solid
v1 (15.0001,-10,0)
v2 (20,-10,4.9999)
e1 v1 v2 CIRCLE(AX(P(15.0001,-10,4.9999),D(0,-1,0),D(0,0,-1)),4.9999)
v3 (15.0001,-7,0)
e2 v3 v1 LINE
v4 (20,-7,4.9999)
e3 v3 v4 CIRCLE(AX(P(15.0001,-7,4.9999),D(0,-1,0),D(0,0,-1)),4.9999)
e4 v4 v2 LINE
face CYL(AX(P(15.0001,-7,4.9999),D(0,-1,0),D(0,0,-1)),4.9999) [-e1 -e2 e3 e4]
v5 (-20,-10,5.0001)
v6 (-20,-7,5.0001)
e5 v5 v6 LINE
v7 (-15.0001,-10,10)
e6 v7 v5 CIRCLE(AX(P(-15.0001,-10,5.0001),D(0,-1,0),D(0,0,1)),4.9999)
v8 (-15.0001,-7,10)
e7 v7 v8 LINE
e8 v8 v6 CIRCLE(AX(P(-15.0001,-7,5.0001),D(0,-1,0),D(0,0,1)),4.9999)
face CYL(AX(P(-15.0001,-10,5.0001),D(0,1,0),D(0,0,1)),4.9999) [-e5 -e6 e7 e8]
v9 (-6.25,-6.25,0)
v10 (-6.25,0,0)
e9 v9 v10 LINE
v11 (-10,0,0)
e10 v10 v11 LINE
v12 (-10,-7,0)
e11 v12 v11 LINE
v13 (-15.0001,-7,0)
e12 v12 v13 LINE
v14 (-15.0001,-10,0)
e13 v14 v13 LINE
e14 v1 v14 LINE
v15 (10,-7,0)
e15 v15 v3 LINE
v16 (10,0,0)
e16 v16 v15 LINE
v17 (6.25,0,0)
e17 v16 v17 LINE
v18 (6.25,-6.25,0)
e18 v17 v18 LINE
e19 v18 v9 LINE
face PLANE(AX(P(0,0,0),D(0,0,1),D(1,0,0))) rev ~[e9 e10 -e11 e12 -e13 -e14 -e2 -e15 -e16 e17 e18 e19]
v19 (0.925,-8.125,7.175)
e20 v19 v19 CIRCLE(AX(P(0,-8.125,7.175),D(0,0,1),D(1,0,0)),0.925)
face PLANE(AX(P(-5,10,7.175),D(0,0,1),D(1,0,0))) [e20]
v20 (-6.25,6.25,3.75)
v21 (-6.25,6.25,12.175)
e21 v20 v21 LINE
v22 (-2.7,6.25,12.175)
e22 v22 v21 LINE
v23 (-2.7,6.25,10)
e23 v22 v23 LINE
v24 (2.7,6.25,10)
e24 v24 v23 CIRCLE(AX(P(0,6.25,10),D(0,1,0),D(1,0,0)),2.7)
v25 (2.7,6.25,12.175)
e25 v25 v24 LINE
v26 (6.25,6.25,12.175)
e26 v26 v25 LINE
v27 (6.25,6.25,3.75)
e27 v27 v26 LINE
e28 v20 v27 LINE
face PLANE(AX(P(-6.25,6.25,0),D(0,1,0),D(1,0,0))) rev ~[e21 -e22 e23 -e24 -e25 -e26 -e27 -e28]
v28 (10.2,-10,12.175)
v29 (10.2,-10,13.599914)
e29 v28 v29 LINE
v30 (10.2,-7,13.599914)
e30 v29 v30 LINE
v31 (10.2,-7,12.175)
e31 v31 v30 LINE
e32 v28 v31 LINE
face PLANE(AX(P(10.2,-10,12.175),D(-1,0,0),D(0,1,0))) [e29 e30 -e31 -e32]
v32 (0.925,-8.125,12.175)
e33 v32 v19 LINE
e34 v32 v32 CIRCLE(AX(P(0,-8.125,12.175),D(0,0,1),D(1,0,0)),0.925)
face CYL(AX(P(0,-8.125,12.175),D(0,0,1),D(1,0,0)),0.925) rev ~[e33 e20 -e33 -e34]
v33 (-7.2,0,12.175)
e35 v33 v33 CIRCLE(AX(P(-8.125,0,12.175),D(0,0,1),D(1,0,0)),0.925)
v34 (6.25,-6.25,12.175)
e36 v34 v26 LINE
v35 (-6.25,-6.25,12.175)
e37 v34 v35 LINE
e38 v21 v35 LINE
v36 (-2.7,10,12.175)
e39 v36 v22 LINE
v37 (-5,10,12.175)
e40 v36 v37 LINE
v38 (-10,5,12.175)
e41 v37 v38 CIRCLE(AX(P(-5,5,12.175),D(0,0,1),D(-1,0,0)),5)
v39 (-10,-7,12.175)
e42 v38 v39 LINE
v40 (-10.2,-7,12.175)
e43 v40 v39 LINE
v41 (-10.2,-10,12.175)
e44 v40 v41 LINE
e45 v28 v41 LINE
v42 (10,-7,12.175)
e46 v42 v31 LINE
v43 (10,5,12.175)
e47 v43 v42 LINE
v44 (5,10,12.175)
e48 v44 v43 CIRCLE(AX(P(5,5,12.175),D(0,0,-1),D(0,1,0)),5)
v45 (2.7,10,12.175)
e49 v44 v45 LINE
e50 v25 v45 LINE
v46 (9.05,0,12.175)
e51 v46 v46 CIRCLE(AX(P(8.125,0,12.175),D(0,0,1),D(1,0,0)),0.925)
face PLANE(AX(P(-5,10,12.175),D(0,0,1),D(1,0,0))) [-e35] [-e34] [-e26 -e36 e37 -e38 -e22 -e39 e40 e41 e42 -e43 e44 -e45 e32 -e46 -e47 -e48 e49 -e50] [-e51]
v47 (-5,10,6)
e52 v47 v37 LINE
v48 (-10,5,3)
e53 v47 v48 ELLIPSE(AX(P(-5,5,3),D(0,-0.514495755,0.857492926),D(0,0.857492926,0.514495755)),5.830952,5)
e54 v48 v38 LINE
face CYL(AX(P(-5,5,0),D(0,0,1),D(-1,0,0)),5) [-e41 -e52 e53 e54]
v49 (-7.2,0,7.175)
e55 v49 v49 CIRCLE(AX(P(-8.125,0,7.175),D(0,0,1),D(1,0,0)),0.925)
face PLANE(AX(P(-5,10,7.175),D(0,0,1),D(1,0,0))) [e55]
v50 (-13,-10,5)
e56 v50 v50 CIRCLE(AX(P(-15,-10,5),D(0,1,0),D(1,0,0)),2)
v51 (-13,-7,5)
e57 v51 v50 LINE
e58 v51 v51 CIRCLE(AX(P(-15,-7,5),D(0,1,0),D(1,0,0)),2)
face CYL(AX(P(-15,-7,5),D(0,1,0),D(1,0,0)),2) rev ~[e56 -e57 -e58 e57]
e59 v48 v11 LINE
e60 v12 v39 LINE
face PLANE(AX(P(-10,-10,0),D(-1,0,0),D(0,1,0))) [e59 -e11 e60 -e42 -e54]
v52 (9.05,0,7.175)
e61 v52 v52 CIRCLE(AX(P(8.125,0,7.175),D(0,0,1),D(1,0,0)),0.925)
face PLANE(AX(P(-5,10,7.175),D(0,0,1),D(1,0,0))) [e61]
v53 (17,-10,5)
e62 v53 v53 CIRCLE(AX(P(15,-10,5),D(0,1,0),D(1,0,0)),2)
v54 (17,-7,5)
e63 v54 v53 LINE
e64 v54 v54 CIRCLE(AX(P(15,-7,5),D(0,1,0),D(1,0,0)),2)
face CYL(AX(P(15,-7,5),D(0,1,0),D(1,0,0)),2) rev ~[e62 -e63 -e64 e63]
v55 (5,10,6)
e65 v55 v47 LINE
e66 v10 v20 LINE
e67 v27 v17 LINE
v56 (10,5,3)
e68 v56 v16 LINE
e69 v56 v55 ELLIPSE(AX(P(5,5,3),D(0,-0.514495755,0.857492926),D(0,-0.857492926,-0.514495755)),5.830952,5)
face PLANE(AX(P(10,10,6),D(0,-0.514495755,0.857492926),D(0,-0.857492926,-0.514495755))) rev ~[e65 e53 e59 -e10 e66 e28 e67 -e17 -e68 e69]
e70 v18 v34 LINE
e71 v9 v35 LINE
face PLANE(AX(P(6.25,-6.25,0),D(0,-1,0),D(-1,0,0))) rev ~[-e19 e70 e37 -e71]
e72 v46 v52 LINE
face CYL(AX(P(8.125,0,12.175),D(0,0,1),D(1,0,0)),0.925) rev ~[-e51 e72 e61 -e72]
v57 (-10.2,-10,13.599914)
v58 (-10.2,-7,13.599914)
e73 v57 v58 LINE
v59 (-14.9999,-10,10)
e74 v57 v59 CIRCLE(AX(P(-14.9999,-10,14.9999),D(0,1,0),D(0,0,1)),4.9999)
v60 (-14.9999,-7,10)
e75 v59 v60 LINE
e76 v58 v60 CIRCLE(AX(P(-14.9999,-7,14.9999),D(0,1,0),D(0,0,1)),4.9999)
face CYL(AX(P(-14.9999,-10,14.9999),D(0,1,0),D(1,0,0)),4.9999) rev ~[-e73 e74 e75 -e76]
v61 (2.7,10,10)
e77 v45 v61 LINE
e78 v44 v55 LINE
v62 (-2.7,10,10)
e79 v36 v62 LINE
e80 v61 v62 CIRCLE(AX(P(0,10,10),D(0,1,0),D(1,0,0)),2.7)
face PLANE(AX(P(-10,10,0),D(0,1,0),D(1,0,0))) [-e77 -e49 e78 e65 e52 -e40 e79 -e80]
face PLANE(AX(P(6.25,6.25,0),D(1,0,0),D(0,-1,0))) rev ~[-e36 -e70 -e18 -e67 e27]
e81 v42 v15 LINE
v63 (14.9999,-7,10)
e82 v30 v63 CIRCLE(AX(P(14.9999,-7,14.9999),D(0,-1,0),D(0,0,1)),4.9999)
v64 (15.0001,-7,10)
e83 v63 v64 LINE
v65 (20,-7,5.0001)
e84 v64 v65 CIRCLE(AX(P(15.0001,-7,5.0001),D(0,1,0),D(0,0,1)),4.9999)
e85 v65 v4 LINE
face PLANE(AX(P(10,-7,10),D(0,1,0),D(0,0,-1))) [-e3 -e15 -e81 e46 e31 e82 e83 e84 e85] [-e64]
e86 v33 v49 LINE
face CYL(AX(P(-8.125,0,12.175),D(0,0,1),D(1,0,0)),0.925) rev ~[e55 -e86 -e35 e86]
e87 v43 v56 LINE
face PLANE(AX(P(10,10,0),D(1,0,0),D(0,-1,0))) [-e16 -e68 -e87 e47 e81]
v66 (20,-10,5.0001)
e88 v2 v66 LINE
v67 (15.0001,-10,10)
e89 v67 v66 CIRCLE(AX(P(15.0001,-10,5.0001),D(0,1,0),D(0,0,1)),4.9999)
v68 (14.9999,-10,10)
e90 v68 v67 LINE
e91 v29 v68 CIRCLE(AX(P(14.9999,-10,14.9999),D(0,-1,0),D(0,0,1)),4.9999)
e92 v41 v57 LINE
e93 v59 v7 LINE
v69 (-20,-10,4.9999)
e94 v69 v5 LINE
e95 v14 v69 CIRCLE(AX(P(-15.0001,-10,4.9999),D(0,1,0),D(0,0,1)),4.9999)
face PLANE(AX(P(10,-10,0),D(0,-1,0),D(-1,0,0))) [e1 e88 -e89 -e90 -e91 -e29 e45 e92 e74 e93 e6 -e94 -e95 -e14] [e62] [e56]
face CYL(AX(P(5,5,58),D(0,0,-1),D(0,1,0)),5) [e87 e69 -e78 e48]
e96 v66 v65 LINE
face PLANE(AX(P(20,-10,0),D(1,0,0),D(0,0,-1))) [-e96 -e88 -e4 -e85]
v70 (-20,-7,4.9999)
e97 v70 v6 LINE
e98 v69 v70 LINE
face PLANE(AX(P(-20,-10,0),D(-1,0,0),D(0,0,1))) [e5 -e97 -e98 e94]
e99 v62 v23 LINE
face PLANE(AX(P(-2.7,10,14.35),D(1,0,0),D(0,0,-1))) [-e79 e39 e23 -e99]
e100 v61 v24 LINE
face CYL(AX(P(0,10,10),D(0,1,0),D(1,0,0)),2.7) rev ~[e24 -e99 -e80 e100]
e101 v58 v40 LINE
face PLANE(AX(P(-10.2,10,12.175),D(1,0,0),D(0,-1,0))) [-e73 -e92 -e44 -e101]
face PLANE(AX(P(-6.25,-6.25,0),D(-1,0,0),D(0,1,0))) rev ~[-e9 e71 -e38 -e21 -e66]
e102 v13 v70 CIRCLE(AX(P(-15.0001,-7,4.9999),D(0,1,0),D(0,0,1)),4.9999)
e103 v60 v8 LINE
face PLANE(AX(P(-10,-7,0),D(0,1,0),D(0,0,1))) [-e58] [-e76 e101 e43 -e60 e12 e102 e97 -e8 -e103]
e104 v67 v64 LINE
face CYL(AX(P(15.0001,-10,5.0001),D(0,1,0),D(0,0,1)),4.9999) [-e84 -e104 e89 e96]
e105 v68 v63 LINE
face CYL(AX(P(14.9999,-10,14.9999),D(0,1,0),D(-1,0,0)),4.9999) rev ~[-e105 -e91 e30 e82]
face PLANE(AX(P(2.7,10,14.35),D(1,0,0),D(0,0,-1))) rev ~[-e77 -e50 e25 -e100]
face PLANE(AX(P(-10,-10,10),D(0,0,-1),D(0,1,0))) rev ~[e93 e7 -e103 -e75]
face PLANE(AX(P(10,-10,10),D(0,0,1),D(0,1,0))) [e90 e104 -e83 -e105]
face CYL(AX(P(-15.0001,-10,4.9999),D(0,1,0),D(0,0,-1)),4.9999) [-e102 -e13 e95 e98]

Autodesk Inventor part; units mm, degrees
ref_plane "YZ Plane" through (0, 0, 0) normal (1, 0, 0) x (0, 1, 0)
ref_plane "XZ Plane" through (0, 0, 0) normal (0, 1, 0) x (-1, 0, 0)
ref_plane "XY Plane" through (0, 0, 0) normal (0, 0, 1) x (1, 0, 0)
sketch "Sketch1" plane through (0, 0, 0) normal (0, 0, 1) x (1, 0, 0)
  line L0 (-6.25, 6.25) -> (6.25, 6.25)
  line L1 (6.25, 6.25) -> (6.25, -6.25)
  line L2 (6.25, -6.25) -> (-6.25, -6.25)
  line L3 (-6.25, -6.25) -> (-6.25, 6.25)
  line L4 (-10, 10) -> (10, 10)
  line L5 (10, 10) -> (10, -10)
  line L6 (10, -10) -> (-10, -10)
  line L7 (-10, -10) -> (-10, 10)
  line L8 (-10, 10) -> (10, -10) construction
  line L9 (10, 10) -> (-10, -10) construction
  dimension "d3" = 20
  dimension "d4" = 20
  dimension "d5" = 3.75
  dimension "d6" = 16.25
  dimension "d7" = 3.75
  dimension "d8" = 16.25
extrude "Extrusion1" add sketch "Sketch1" along normal blind 55
sketch "Sketch2" plane through (0, 0, 55) normal (0, 0, 1) x (1, 0, 0)
  line L0 (10, 10) -> (-10, 10) projected
  line L1 (-10, -10) -> (10, -10)
  line L2 (10, -10) -> (10, 10)
  line L3 (10, 10) -> (-10, 10)
  line L4 (-10, 10) -> (-10, -10)
  line L5 (-10, -10) -> (10, 10) construction
  line L6 (10, -10) -> (-10, 10) construction
  point P0 (0, 0)
extrude "Extrusion2" add sketch "Sketch2" along normal blind 3
sketch "Sketch3" plane through (0, 0, 55) normal (0, 0, -1) x (-1, 0, 0)
  circle A0 centre (0, 0) radius 4
  dimension "d13" = 8
extrude "Extrusion3" add sketch "Sketch3" along normal blind 14
sketch "Sketch4" plane through (10, -10, 0) normal (1, 0, 0) x (0, 0, -1)
  line L0 (0, 0) -> (-58, 0) projected
  line L1 (0, 0) -> (-10, 0)
  line L2 (-10, 0) -> (-10, 3)
  line L3 (-10, 3) -> (0, 3)
  line L4 (0, 3) -> (0, 0)
  line L5 (-58, 0) -> (-58, 20) projected
  line L6 (-58, 0) -> (-48, 0)
  line L7 (-48, 0) -> (-48, 3)
  line L8 (-48, 3) -> (-58, 3)
  line L9 (-58, 3) -> (-58, 0)
  point P0 (0, 10)
  dimension "d16" = 10
  dimension "d17" = 3
  dimension "d18" = 10
  dimension "d19" = 3
extrude "Extrusion4" add sketch "Sketch4" along normal blind 10
sketch "Sketch5" plane through (-10, -10, 0) normal (-1, 0, 0) x (0, 0, 1)
  line L0 (0, 0) -> (0, 20) projected
  line L1 (0, 3) -> (10, 3) projected
  line L2 (0, 0) -> (10, 0)
  line L3 (10, 0) -> (10, 3)
  line L4 (10, 3) -> (0, 3)
  line L5 (0, 3) -> (0, 0)
  line L6 (58, 20) -> (58, 0) projected
  line L7 (58, 0) -> (48, 0)
  line L8 (48, 0) -> (48, 3)
  line L9 (48, 3) -> (58, 3)
  line L10 (58, 3) -> (58, 0)
  point P0 (0, 10)
  dimension "d22" = 10
  dimension "d23" = 3
  dimension "d24" = 10
  dimension "d25" = 3
extrude "Extrusion5" add sketch "Sketch5" along normal blind 10
fillet "Fillet1" radius 5 12 edges at (-20, -8.5, 10) (-20, -8.5, 0) (-10, -8.5, 10) (-10, -8.5, 48) (-20, -8.5, 48) (-20, -8.5, 58) (20, -8.5, 0) (10, -8.5, 10) (20, -8.5, 10) (10, -8.5, 48) (20, -8.5, 48) (20, -8.5, 58)
sketch "Sketch6" plane through (10, -7, 15) normal (0, 1, 0) x (1, 0, 0)
  arc A0 (-25, 15) -> (-25, 5) centre (-25, 10) ccw projected
  circle A1 centre (-25, 10) radius 2
  arc A2 (5, 5) -> (5, 15) centre (5, 10) ccw projected
  circle A3 centre (5, 10) radius 2
  arc A4 (-25, -33) -> (-25, -43) centre (-25, -38) ccw projected
  circle A5 centre (-25, -38) radius 2
  arc A6 (5, -43) -> (5, -33) centre (5, -38) ccw projected
  circle A7 centre (5, -38) radius 2
  point P0 (-10, 15)
  dimension "d29" = 4
  dimension "d30" = 4
  dimension "d31" = 4
extrude "Extrusion6" cut sketch "Sketch6" against normal blind 10
fillet "Fillet2" radius 5 2 edges at (-10, 10, 29) (10, 10, 29)
sketch "Sketch7" plane through (-5, 10, 0) normal (0, 1, 0) x (1, 0, 0)
  arc A0 (7.7, -10) -> (2.3, -10) centre (5, -10) ccw
  line L0 (0, -58) -> (0, 0) projected
  arc A1 (2.3, -14.35) -> (7.7, -14.35) centre (5, -14.35) ccw
  line L1 (2.3, -14.35) -> (2.3, -10)
  line L2 (7.7, -14.35) -> (7.7, -10)
  point P0 (5, 0)
  dimension "d35" = 5.4
  dimension "d36" = 5
  dimension "d37" = 10
  dimension "d38" = 5.4
  dimension "d39" = 4.35
  dimension "d40" = 5
extrude "Extrusion7" cut sketch "Sketch7" against normal blind 10
sketch "Sketch8" plane through (-5, 10, 0) normal (0, 1, 0) x (1, 0, 0)
  line L0 (2.3, -10) -> (2.3, -14.35) projected
  line L1 (2.3, -12.175) -> (-5, -12.175)
  line L2 (-5, 0) -> (-5, -58) projected
  line L3 (-5, -15) -> (-5, -43) projected
  line L4 (-5, -12.175) -> (-5, -43)
  line L5 (-5, -43) -> (-15.8375, -43)
  line L6 (-15.8375, -43) -> (-15.3443, -61.3042)
  line L7 (-15.3443, -61.3042) -> (28.3034, -61.3042)
  line L8 (28.3034, -61.3042) -> (28.3034, -43)
  line L9 (15, -15) -> (15, -43) projected
  line L10 (28.3034, -43) -> (15, -43)
  line L11 (15, -43) -> (15, -12.175)
  line L12 (15, -12.175) -> (2.3, -12.175)
  point P0 (5, 0)
  dimension "d43" = 1.543
  dimension "d44" = 13.3034
  dimension "d45" = 18.3042
  dimension "d46" = 31.5804
extrude "Extrusion8" cut sketch "Sketch8" against normal blind 20
sketch "Sketch9" plane through (-5, 10, 12.175) normal (0, 0, 1) x (1, 0, 0)
  circle A0 centre (5, -18.125) radius 0.925
  circle A1 centre (13.125, -10) radius 0.925
  circle A2 centre (-3.125, -10) radius 0.925
  line L0 (-1.25, -3.75) -> (-1.25, -16.25) projected
  line L1 (11.25, -16.25) -> (11.25, -3.75) projected
  line L2 (-1.25, -16.25) -> (11.25, -16.25) projected
  point P0 (5, -10)
  dimension "d49" = 1.85
  dimension "d50" = 1.85
  dimension "d51" = 1.85
  dimension "d52" = 1.875
  dimension "d53" = 1.875
  dimension "d54" = 1.875
  dimension "d55" = 0
  dimension "d56" = 0
  dimension "d57" = 0
extrude "Extrusion9" cut sketch "Sketch9" against normal blind 5
sketch "Sketch10" plane through (-5, 10, 12.175) normal (0, 0, 1) x (1, 0, 0)
  line L0 (20, -20) -> (-10, -20) projected
  line L1 (15.2, 0) -> (-5.2, 0)
  line L2 (-5.2, 0) -> (-5.2, -20)
  line L3 (-5.2, -20) -> (15.2, -20)
  line L4 (15.2, -20) -> (15.2, 0)
  line L5 (15.2, 0) -> (-5.2, -20) construction
  line L6 (-5.2, 0) -> (15.2, -20) construction
  point P0 (5, -10)
  dimension "d60" = 20.4
extrude "Extrusion10" cut sketch "Sketch10" along normal blind 10
sketch "Sketch12" plane through (10, -7, 0) normal (1, 0, 0) x (0, 0, -1)
  line L0 (0, 17) -> (0, 12) projected
  line L1 (0, 17) -> (-6, 17)
  line L2 (-12.175, 17) -> (0, 17) projected
  line L3 (0, 17) -> (0, 7)
  line L4 (0, 13.25) -> (0, 0.75) projected
  line L5 (-6, 17) -> (0, 7)
  dimension "d68" = 6
  dimension "d69" = 10
extrude "Extrusion12" cut sketch "Sketch12" against normal blind 20
properties part number "15 slot pinhuls klijn"
